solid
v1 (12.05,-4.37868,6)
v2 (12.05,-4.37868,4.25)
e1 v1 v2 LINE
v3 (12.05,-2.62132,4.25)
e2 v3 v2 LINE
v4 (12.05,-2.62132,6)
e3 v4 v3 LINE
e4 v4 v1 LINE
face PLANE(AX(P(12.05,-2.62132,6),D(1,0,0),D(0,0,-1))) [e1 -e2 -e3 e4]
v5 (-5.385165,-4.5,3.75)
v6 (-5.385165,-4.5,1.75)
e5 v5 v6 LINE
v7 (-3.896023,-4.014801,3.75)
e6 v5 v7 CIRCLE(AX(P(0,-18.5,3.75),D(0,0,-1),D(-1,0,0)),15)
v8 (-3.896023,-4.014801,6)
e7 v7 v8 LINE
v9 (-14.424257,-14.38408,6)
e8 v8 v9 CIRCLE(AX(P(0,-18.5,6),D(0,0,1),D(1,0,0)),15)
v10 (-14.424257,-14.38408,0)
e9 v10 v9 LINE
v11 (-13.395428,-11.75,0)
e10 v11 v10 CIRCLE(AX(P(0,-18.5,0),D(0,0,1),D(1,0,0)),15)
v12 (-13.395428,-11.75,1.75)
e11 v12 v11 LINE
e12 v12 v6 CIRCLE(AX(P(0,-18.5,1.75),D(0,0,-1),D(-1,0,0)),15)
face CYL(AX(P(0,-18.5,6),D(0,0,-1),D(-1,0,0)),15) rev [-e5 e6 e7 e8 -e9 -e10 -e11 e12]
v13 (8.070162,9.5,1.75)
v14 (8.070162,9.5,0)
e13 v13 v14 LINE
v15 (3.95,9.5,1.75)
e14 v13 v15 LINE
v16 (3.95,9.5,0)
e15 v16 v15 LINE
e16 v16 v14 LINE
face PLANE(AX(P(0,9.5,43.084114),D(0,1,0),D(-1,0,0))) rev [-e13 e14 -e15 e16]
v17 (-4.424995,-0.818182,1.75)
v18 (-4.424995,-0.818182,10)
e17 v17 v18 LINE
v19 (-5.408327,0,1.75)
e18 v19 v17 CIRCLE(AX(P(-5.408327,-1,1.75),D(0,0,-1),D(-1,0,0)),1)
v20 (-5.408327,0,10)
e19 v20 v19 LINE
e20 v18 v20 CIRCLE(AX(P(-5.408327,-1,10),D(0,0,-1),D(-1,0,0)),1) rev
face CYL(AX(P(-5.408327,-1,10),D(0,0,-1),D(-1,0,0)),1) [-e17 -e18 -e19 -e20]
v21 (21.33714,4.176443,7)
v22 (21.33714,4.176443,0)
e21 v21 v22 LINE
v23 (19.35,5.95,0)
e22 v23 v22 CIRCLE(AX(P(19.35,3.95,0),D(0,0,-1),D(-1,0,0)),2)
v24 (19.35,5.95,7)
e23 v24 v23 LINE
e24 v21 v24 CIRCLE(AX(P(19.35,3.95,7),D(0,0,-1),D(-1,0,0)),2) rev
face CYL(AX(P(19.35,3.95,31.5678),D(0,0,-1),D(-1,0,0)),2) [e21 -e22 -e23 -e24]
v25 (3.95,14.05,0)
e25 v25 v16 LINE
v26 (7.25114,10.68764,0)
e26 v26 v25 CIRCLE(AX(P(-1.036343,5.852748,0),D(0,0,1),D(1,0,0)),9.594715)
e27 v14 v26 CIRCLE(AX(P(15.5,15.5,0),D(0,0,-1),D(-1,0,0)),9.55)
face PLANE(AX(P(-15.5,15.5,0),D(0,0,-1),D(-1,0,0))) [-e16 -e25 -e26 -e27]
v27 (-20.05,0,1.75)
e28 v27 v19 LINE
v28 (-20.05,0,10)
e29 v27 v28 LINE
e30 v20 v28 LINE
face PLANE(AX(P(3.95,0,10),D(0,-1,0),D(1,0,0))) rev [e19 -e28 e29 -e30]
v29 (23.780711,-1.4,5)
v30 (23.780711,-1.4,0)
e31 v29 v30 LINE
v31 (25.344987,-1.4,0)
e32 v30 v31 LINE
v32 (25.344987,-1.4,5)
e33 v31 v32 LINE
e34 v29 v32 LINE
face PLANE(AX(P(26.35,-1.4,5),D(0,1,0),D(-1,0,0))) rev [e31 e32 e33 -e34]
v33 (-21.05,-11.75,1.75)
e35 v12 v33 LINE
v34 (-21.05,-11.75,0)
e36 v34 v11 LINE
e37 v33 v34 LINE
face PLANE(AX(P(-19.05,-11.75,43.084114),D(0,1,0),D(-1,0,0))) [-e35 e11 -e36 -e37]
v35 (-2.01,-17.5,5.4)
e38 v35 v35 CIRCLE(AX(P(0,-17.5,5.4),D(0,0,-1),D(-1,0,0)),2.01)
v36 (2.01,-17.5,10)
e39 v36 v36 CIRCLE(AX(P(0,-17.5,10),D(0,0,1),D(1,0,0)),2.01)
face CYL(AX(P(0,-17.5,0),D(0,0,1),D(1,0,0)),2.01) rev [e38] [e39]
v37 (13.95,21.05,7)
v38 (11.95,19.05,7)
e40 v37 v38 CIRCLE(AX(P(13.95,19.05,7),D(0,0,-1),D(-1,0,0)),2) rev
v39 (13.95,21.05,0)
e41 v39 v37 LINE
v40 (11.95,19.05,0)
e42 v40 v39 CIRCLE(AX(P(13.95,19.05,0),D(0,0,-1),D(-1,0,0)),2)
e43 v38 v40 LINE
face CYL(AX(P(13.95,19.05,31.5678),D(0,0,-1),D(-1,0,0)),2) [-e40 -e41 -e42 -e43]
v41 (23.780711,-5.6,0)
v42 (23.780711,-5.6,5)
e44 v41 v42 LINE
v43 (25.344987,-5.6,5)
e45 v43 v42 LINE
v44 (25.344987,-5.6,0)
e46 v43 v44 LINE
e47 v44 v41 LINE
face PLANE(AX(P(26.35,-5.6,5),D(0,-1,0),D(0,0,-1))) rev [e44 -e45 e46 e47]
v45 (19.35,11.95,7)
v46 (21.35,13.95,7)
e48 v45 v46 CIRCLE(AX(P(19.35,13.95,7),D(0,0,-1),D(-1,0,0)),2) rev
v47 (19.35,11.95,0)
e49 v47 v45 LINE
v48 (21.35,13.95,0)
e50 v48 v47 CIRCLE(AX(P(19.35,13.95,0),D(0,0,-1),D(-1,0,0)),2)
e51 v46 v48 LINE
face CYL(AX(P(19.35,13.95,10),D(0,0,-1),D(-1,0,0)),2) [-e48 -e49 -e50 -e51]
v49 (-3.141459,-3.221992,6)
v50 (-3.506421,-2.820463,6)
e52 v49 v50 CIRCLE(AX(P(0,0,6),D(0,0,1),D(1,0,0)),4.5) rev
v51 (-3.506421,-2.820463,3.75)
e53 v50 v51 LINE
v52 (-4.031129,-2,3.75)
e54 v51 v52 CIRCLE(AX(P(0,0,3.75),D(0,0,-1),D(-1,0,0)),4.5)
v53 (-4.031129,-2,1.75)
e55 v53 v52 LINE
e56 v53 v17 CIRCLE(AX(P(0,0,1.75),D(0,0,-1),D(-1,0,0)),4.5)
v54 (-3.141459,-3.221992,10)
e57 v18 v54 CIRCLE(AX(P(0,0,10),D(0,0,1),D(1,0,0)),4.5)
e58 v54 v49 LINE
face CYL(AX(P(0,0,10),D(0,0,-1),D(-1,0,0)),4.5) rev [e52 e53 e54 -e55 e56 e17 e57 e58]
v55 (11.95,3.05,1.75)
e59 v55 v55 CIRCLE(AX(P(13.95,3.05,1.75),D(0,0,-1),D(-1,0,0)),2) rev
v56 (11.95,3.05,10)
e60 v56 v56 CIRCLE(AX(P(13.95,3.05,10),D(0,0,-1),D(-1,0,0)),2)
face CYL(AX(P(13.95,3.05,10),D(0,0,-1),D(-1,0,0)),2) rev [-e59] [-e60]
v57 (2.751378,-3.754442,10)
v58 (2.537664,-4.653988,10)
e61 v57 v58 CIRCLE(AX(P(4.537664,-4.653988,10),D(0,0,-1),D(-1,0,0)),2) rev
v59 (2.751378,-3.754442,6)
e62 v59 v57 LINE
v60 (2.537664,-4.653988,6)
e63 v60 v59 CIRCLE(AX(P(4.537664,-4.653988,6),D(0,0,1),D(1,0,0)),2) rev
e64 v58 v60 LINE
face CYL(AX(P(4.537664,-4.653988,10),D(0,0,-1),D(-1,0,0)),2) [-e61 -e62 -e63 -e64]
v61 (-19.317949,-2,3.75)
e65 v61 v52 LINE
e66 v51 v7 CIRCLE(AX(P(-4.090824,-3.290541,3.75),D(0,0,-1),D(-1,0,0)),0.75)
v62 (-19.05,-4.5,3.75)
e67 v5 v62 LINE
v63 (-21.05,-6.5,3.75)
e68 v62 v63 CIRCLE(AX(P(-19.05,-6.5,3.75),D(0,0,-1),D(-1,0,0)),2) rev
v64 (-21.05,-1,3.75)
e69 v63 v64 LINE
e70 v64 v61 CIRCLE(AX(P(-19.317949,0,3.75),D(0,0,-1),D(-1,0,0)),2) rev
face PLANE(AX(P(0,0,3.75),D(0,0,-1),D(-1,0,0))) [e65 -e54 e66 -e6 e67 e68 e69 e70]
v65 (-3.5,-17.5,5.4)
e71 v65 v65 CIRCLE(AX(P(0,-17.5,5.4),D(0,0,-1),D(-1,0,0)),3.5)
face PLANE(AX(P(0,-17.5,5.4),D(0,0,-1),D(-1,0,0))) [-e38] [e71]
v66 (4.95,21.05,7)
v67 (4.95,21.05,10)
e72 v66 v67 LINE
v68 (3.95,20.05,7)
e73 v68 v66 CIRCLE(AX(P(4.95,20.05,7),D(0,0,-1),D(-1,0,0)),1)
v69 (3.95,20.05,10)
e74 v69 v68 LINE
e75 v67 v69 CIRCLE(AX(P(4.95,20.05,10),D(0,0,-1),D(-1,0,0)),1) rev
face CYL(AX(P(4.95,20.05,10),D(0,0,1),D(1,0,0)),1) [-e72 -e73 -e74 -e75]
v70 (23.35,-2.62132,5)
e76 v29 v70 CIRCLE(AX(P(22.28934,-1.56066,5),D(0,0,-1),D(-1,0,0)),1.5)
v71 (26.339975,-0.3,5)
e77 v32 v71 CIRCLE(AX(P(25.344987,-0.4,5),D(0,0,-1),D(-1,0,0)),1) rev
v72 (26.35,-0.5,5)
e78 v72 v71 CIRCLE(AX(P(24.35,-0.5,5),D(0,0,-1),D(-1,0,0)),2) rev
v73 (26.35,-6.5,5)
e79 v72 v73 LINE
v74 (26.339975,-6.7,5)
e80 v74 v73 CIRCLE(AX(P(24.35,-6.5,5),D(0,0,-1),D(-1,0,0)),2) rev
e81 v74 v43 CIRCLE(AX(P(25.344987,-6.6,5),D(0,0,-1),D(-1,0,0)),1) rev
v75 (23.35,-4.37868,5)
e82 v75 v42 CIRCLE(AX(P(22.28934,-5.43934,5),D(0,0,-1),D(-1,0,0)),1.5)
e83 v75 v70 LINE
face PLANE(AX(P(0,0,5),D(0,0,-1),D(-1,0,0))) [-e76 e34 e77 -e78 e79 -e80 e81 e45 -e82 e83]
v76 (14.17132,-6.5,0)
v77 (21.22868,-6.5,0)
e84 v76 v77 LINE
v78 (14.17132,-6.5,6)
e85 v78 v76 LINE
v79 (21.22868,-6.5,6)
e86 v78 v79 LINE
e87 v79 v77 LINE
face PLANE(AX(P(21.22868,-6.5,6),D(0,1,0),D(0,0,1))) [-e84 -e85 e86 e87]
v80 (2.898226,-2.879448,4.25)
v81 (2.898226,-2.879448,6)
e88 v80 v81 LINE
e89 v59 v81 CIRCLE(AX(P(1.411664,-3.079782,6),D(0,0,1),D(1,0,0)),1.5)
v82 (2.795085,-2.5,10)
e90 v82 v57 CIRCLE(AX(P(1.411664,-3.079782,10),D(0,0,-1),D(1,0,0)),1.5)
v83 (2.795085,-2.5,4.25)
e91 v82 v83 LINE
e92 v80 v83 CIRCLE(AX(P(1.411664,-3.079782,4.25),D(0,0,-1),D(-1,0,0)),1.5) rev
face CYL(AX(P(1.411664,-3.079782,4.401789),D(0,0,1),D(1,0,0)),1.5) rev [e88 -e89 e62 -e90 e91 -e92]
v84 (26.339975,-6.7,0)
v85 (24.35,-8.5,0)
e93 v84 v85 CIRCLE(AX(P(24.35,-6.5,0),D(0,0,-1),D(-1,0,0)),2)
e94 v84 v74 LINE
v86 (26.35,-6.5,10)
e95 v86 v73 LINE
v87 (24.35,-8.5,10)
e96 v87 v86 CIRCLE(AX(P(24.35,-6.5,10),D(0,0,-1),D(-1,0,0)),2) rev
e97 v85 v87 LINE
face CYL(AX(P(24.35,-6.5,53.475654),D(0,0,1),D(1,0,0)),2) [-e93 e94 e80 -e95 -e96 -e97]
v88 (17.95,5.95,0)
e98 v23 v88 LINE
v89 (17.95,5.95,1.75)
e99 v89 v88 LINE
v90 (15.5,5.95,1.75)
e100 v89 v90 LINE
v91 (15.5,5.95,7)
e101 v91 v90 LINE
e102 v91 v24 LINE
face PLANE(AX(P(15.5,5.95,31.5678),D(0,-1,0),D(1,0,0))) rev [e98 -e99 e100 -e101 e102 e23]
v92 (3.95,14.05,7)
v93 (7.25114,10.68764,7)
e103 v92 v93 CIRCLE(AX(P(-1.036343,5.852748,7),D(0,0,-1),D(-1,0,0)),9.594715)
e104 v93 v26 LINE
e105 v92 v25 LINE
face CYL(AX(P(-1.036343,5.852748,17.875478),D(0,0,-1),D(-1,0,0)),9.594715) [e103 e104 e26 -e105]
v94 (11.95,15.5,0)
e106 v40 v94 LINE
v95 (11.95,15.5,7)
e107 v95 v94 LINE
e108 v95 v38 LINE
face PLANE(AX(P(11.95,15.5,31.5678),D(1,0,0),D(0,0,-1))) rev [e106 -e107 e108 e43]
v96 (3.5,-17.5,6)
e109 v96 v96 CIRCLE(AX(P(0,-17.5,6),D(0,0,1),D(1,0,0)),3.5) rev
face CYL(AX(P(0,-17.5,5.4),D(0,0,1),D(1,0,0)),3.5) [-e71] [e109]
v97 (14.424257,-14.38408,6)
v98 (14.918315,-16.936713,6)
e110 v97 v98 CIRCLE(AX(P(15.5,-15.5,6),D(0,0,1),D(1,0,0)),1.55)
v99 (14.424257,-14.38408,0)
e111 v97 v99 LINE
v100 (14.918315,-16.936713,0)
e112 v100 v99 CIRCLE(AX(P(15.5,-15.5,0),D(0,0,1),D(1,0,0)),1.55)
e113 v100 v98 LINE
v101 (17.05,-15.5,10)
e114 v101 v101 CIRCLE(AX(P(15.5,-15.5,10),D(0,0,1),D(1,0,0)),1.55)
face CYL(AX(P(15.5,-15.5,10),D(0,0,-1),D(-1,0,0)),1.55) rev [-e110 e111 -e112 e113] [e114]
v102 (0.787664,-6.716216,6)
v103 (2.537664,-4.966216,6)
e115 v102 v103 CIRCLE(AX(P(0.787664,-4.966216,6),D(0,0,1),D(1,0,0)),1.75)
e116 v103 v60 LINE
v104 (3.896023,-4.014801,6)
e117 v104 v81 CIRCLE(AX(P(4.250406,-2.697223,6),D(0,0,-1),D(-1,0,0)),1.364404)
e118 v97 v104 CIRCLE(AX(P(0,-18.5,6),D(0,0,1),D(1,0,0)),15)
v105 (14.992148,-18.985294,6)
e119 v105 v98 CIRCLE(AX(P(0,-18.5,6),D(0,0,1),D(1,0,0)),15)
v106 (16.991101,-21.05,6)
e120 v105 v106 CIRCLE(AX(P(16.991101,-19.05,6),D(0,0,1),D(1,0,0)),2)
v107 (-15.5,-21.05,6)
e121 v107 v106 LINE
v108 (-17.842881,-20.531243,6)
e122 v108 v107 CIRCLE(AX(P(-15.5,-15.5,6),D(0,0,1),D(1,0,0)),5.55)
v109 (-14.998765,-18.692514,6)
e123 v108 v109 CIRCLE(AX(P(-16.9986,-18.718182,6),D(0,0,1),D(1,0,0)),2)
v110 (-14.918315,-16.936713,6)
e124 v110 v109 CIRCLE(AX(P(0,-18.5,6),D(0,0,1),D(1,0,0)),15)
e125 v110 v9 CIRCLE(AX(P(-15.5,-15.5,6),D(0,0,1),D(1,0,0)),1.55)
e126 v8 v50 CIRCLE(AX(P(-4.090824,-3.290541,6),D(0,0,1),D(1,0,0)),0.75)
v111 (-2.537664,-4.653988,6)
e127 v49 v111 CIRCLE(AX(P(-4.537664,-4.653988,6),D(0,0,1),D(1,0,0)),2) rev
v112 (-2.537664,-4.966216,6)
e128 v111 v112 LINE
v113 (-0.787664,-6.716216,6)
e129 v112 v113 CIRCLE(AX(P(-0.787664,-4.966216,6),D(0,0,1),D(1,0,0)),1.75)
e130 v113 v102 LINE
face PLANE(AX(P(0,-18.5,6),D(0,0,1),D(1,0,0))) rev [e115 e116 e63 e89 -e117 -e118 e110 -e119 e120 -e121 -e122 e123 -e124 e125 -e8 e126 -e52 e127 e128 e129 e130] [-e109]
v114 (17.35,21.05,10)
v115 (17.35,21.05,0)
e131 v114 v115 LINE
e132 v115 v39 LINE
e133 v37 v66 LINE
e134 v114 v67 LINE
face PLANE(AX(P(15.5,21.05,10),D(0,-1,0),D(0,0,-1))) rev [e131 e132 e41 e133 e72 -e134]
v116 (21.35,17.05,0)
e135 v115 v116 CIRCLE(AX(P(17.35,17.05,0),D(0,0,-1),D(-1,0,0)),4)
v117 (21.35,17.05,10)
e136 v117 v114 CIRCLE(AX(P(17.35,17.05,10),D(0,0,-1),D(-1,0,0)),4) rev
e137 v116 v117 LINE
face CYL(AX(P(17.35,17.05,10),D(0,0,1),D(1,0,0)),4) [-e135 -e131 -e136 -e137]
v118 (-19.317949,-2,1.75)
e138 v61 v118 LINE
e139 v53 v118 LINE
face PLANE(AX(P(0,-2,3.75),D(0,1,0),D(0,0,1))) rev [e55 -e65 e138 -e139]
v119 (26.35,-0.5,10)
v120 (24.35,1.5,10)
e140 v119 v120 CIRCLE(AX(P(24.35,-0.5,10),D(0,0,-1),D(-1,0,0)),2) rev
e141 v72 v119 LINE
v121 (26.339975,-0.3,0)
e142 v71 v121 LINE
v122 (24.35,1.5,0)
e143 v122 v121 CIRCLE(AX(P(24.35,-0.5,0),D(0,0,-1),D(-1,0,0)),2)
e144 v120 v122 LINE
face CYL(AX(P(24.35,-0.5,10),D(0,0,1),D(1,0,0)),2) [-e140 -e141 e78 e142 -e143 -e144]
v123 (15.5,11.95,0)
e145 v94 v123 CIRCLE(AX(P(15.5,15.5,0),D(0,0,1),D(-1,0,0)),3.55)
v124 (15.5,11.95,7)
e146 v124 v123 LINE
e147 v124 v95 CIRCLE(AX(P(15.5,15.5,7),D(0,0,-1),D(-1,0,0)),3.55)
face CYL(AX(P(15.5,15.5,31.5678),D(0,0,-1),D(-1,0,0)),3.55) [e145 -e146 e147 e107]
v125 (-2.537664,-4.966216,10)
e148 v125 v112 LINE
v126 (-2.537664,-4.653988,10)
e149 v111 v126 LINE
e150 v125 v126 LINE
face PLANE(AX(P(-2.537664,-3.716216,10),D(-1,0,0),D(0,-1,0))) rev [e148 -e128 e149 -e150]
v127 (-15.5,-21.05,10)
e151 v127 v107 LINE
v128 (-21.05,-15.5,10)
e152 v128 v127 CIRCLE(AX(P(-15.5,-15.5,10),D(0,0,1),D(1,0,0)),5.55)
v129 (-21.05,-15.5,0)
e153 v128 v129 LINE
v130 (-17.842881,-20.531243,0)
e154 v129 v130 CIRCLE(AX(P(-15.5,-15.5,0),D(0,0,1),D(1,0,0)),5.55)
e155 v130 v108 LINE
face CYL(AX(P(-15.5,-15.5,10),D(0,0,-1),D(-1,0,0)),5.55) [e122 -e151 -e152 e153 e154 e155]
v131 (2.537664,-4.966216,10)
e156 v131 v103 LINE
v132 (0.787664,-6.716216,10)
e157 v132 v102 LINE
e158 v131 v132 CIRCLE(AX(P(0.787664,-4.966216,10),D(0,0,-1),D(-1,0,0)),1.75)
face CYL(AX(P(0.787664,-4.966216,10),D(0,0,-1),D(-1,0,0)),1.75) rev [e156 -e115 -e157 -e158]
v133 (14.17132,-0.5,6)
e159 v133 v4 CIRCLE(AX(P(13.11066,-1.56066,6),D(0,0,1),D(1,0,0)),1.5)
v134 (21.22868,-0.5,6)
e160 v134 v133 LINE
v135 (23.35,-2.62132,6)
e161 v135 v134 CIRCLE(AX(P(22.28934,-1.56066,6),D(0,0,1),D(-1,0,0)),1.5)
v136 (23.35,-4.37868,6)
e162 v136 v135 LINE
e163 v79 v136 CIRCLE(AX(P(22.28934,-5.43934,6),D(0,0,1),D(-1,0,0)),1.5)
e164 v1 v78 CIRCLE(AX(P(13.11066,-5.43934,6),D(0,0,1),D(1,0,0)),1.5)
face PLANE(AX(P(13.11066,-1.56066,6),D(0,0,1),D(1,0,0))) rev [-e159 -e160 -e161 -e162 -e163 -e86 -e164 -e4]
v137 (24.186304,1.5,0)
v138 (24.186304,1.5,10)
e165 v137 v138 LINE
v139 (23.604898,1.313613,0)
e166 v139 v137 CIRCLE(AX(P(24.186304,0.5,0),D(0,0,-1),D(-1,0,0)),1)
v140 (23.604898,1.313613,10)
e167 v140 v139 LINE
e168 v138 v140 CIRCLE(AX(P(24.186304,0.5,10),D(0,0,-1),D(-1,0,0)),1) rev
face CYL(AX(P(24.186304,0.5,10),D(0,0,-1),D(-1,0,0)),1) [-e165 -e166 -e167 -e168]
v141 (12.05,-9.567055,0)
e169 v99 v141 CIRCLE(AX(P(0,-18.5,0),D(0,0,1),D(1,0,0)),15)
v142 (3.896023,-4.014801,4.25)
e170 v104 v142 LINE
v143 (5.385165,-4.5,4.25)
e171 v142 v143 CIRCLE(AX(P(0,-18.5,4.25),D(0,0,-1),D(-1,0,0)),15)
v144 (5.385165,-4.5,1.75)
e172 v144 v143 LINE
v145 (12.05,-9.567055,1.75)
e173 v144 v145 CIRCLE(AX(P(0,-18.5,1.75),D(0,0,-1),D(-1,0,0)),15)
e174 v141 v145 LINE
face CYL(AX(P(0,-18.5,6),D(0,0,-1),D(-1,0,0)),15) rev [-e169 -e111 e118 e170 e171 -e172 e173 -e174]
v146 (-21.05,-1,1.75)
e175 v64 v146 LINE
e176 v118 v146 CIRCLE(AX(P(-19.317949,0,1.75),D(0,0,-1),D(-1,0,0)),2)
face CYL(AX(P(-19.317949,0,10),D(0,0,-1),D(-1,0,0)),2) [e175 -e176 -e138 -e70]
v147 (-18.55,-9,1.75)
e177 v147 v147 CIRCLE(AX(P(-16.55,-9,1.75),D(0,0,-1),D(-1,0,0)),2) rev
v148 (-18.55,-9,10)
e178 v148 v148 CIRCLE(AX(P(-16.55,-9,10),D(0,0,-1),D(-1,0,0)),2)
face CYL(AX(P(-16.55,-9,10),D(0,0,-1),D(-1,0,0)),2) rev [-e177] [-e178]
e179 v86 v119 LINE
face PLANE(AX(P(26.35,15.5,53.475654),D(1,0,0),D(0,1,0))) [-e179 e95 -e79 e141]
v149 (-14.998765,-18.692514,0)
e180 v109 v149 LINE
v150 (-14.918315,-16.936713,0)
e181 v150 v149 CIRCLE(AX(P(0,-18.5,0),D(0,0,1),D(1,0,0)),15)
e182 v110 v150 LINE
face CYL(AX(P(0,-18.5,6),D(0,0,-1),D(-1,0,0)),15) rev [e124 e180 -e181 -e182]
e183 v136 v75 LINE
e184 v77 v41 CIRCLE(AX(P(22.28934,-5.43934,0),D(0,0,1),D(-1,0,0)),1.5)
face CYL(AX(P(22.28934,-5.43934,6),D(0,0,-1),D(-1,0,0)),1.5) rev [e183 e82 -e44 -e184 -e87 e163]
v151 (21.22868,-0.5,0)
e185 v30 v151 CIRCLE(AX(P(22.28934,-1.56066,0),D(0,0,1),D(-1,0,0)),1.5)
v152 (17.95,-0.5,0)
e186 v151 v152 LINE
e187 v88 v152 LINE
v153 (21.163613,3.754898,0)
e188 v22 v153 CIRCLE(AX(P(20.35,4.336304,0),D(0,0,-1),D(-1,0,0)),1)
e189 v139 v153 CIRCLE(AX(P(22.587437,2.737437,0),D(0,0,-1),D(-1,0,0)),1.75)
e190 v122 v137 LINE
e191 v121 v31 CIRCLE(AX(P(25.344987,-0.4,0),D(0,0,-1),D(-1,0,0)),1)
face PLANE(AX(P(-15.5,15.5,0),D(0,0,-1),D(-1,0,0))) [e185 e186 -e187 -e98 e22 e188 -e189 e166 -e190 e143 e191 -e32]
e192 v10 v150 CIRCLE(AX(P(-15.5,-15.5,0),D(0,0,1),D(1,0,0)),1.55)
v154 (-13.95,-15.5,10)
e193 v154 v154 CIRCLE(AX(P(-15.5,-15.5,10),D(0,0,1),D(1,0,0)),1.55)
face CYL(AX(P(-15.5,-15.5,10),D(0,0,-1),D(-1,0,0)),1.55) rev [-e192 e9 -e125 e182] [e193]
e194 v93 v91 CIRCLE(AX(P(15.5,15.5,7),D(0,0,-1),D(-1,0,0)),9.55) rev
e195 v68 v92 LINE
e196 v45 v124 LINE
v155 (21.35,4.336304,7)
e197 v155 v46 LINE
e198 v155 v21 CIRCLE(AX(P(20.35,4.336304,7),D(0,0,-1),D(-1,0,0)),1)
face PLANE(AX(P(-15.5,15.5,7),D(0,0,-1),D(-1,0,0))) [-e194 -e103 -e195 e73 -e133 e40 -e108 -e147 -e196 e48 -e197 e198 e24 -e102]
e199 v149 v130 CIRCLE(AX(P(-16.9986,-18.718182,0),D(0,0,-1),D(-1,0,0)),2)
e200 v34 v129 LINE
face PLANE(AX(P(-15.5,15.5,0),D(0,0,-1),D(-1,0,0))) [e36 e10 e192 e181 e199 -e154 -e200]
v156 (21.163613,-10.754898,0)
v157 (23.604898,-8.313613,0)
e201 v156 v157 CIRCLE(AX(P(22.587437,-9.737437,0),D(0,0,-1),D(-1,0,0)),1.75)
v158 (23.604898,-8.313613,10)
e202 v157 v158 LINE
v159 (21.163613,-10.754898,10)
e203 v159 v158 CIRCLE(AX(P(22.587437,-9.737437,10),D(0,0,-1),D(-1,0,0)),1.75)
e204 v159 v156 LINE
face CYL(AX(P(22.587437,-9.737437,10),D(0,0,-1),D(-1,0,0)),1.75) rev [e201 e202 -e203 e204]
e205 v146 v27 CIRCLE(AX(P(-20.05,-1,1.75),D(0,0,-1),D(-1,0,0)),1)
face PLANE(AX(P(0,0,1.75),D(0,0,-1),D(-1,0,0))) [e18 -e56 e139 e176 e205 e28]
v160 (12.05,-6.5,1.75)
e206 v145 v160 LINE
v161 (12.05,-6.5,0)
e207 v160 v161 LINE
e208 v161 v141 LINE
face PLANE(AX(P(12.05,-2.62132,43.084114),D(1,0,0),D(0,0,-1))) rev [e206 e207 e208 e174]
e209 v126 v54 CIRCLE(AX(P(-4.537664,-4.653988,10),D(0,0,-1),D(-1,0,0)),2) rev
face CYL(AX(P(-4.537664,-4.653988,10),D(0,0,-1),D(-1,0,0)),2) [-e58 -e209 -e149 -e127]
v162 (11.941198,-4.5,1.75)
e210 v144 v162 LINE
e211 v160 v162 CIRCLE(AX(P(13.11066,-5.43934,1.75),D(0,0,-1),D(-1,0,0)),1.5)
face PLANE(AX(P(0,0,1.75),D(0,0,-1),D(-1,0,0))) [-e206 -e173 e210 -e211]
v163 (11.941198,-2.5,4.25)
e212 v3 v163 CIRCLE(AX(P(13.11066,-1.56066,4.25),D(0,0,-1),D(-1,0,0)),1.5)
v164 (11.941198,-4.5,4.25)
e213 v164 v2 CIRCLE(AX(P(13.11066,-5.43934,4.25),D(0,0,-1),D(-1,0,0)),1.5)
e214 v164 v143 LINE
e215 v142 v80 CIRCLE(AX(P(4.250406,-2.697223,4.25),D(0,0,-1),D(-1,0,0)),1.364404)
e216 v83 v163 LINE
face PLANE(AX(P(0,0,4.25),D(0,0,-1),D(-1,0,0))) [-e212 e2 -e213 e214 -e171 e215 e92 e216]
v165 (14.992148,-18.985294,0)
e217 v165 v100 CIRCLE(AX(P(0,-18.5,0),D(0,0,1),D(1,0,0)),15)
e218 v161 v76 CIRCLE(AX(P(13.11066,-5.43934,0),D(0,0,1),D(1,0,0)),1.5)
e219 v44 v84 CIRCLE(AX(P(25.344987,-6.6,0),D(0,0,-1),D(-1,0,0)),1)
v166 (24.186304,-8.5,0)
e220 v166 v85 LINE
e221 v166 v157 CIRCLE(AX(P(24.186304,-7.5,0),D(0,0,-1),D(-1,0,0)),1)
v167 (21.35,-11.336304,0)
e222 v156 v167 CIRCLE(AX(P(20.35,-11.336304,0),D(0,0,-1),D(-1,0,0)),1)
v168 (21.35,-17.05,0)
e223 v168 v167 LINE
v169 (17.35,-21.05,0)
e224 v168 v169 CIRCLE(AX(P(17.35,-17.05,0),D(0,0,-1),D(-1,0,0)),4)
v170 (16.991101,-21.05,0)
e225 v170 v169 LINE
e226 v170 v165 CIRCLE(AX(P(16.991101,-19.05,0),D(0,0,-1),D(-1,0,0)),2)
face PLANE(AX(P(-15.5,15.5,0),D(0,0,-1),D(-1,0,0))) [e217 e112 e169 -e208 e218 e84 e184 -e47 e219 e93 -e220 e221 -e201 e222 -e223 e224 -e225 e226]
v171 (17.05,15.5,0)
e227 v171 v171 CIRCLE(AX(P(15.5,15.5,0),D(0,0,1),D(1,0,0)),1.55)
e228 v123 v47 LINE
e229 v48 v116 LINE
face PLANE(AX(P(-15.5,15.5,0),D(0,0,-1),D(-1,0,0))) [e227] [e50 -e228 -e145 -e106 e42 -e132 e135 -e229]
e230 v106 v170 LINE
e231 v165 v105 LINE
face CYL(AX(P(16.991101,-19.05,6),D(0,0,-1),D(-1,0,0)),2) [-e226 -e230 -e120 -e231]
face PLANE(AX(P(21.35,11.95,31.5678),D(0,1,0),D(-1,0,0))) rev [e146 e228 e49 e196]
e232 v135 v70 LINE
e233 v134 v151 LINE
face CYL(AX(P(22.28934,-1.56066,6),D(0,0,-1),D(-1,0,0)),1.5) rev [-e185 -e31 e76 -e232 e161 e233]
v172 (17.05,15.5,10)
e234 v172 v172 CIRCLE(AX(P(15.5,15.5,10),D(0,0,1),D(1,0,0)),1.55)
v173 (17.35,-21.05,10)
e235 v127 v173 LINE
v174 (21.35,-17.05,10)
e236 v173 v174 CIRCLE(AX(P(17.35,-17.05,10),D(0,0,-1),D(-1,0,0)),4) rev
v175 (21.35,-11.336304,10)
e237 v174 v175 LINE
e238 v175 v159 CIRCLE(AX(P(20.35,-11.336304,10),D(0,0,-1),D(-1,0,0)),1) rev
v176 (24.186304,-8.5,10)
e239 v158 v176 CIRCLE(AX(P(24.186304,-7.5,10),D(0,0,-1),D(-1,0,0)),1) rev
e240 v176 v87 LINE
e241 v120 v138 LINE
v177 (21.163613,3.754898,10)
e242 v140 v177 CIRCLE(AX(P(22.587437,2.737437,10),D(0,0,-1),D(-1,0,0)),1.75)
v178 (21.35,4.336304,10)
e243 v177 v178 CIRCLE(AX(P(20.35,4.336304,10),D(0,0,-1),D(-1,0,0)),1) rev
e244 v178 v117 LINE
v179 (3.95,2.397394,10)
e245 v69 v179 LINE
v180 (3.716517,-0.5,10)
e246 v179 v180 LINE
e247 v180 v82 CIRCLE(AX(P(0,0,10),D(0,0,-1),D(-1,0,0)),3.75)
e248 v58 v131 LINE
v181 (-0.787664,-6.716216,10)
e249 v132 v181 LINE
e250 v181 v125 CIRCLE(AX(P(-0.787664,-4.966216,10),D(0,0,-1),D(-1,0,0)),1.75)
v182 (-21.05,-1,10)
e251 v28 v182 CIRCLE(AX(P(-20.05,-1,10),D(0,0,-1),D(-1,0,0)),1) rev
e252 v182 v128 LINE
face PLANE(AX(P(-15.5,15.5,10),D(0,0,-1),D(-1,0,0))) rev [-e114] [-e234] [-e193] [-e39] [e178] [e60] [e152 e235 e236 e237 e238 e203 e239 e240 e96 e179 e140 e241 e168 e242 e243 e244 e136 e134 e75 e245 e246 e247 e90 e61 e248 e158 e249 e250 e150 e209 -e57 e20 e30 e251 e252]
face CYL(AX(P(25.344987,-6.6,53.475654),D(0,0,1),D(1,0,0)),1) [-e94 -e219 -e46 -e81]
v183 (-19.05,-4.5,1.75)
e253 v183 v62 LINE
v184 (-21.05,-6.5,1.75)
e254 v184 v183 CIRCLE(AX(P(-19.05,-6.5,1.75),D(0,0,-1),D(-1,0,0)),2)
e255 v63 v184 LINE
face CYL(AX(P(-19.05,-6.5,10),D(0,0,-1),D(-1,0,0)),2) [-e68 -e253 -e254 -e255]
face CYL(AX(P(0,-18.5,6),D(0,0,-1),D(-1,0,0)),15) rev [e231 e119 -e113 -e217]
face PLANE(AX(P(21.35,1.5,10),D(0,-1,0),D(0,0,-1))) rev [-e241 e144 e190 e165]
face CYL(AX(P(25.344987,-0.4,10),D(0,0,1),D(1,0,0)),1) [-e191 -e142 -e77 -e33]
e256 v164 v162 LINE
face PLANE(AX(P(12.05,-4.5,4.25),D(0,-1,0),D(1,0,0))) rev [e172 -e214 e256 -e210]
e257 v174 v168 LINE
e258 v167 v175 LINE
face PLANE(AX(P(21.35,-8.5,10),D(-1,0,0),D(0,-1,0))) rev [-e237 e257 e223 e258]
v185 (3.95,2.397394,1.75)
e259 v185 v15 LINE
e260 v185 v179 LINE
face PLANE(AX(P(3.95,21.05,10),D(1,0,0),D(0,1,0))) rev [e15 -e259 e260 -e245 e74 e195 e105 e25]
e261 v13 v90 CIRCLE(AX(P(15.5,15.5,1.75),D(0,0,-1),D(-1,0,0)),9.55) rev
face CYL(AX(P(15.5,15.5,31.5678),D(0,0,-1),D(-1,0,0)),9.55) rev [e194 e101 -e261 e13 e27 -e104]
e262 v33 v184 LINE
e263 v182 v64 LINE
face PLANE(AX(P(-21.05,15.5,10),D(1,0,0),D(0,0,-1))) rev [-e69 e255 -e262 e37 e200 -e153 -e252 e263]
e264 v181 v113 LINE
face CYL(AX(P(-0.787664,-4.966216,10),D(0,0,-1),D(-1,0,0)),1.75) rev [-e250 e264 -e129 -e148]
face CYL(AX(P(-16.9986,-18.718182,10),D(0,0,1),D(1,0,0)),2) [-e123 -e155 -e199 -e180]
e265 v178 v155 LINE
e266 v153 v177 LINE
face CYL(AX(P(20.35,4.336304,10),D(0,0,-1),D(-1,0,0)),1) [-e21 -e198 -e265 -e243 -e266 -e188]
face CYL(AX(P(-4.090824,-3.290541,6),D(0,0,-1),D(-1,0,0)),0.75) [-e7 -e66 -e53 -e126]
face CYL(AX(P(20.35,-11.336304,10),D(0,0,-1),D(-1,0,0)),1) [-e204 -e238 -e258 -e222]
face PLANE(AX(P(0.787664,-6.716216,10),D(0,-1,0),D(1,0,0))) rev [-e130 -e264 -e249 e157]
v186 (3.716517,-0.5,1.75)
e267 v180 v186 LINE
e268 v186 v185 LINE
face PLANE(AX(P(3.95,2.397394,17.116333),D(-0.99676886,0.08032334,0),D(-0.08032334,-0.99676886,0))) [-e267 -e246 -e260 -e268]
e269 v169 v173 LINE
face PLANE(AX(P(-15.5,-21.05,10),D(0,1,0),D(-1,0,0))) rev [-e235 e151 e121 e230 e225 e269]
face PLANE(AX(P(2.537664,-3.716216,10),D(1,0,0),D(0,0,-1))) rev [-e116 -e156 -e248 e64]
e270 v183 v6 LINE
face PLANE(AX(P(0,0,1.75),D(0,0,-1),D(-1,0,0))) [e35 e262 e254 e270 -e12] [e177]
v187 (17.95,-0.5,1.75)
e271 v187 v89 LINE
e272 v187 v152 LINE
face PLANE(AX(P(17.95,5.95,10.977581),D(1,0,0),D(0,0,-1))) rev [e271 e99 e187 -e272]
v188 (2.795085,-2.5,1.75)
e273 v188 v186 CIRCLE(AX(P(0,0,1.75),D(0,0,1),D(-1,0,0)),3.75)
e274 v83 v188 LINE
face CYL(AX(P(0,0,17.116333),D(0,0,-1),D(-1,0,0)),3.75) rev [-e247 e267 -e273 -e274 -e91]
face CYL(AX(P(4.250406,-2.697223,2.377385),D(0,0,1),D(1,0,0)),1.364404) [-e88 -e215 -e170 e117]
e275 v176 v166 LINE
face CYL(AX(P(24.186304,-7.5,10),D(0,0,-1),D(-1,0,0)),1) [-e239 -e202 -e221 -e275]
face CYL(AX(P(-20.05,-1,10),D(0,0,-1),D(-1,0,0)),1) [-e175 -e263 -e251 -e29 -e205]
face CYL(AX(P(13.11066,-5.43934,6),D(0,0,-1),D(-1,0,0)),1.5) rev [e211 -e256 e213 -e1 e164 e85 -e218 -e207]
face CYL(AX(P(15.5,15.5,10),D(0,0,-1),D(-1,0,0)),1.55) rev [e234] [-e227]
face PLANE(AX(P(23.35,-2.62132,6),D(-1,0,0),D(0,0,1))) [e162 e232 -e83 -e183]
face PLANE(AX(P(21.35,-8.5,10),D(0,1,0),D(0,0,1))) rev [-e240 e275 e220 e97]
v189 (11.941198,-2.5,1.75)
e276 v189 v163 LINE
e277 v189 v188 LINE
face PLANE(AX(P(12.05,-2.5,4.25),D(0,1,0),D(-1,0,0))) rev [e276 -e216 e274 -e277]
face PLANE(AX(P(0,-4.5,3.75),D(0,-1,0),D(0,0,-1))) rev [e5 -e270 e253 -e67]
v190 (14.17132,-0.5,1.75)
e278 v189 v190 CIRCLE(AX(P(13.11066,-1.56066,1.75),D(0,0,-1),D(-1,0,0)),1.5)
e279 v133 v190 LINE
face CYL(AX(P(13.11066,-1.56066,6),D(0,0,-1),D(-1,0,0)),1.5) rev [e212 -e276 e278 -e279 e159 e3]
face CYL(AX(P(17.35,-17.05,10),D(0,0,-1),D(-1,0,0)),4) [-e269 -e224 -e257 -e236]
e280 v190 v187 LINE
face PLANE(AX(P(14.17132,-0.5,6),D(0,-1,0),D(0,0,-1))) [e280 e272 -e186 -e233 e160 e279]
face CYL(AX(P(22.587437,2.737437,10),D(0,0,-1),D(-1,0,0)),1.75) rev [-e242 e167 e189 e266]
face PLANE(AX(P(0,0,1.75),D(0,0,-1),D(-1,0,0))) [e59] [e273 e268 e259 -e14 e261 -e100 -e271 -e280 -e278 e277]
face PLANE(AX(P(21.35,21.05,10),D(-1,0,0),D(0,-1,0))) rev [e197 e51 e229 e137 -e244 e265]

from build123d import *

# Parameters (mm, degrees)
SKETCH1_R                = 4.5
SKETCH1_R_2              = 1.55
BOSS_EXTRUDE1_DEPTH      = 10
BOSS_EXTRUDE5_DEPTH      = 10
SKETCH2_R                = 2.01
CUT_EXTRUDE1_DEPTH       = 36.177052179
SKETCH3_R                = 15
CUT_EXTRUDE3_DEPTH       = 6
CUT_EXTRUDE4_DEPTH       = 6
SKETCH6_W                = 12.05
SKETCH6_H                = 2
CUT_EXTRUDE6_DEPTH       = 4.25
SKETCH24_W               = 3
SKETCH24_H               = 4.2
CUT_EXTRUDE17_DEPTH      = 5
SKETCH13_W               = 21.05
SKETCH13_H               = 2.5
CUT_EXTRUDE10_DEPTH      = 3.75
CUT_EXTRUDE12_DEPTH      = 35.255291562
CUT_EXTRUDE12_DEPTH_BACK = 35.255291562
CUT_EXTRUDE21_DEPTH      = 4.25
SKETCH29_W               = 5
SKETCH29_H               = 19.55
SKETCH29_H_2             = 12.55
CUT_EXTRUDE22_DEPTH      = 36.177052179
SKETCH32_R               = 3.5
SKETCH32_R_2             = 2.01
BOSS_EXTRUDE6_DEPTH      = 0.6
CUT_EXTRUDE24_DEPTH      = 7
FILLET12_R               = 2
FILLET6_R                = 0.75
SKETCH34_W               = 25
SKETCH34_H               = 21.05
CUT_EXTRUDE25_DEPTH      = 36.177052179
SKETCH35_R               = 2
CUT_EXTRUDE27_DEPTH      = 36.177052179
CUT_EXTRUDE29_START      = -1.75
CUT_EXTRUDE29_DEPTH      = 1.75
SKETCH37_W               = 33.1
SKETCH37_H               = 21.25
CUT_EXTRUDE30_DEPTH      = 1.75
SKETCH38_R               = 1.75
CUT_EXTRUDE31_DEPTH      = 36.177052179
CUT_EXTRUDE33_DEPTH      = 7
FILLET13_R               = 4
FILLET7_R                = 2
FILLET3_R                = 2
FILLET15_START           = -1
FILLET15_DEPTH           = 6
FILLET15_START_2         = 4.9438
FILLET15_2_DEPTH         = 6.0562
FILLET14_R               = 1
BOSS_EXTRUDE8_DEPTH      = 8.25
BOSS_EXTRUDE9_START      = -4
BOSS_EXTRUDE9_DEPTH      = 4
BOSS_EXTRUDE10_START     = 1.75
BOSS_EXTRUDE10_DEPTH     = 1.75
CUT_EXTRUDE35_DEPTH      = 1.75
FILLET18_R               = 2


with BuildPart() as part:
    # Sketch1 → Boss-Extrude1 (new body)
    with BuildSketch(Plane.XY):
        with BuildLine():
            Line((-21.05, 15.5), (-21.05, -15.5))
            ThreePointArc((-21.05, -15.5), (-19.424442636, -19.424442636), (-15.5, -21.05))
            Line((-15.5, -21.05), (15.5, -21.05))
            ThreePointArc((15.5, -21.05), (19.424442636, -19.424442636), (21.05, -15.5))
            Line((21.05, -15.5), (21.05, 15.5))
            ThreePointArc((21.05, 15.5), (19.424442636, 19.424442636), (15.5, 21.05))
            Line((15.5, 21.05), (-15.5, 21.05))
            ThreePointArc((-15.5, 21.05), (-19.424442636, 19.424442636), (-21.05, 15.5))
        make_face()
        Circle(SKETCH1_R, mode=Mode.SUBTRACT)
        with Locations((-15.5, -15.5)):
            Circle(SKETCH1_R_2, mode=Mode.SUBTRACT)
        with Locations((15.5, 15.5)):
            Circle(SKETCH1_R_2, mode=Mode.SUBTRACT)
        with Locations((15.5, -15.5)):
            Circle(SKETCH1_R_2, mode=Mode.SUBTRACT)
        with Locations(Location((-15.5, 15.5, 0), (0, 0, 180))):
            Circle(SKETCH1_R_2, mode=Mode.SUBTRACT)
    extrude(amount=BOSS_EXTRUDE1_DEPTH)

    # Sketch23 → Boss-Extrude5 (add)
    with BuildSketch(Plane(origin=(0, 0, 0), x_dir=(-1, 0, 0), z_dir=(0, 0, -1))):
        with BuildLine():
            Line((-21.05, -15.5), (-21.05, 15.5))
            ThreePointArc((-21.05, 15.5), (-19.424442636, 19.424442636), (-15.5, 21.05))
            Line((-15.5, 21.05), (-20.8, 21.05))
            ThreePointArc((-20.8, 21.05), (-24.724442636, 19.424442636), (-26.35, 15.5))
            Line((-26.35, 15.5), (-26.35, -15.5))
            ThreePointArc((-26.35, -15.5), (-24.724442636, -19.424442636), (-20.8, -21.05))
            Line((-20.8, -21.05), (-15.5, -21.05))
            ThreePointArc((-15.5, -21.05), (-19.424442636, -19.424442636), (-21.05, -15.5))
        make_face()
    extrude(amount=-BOSS_EXTRUDE5_DEPTH)

    # Sketch2 → Cut-Extrude1 (cut, through all)
    with BuildSketch(Plane.XY.offset(10)):
        with Locations((0, -17.5)):
            Circle(SKETCH2_R)
    extrude(amount=-CUT_EXTRUDE1_DEPTH, mode=Mode.SUBTRACT)

    # Sketch3 → Cut-Extrude3 (cut)
    with BuildSketch(Plane.XY):
        with Locations((0, -18.5)):
            Circle(SKETCH3_R)
    extrude(amount=CUT_EXTRUDE3_DEPTH, mode=Mode.SUBTRACT)

    # Sketch4 → Cut-Extrude4 (cut)
    with BuildSketch(Plane.XY):
        with BuildLine():
            Line((12.05, -2.621320344), (12.05, -4.378679656))
            ThreePointArc((12.05, -4.378679656), (12.05, -6.5), (14.171320344, -6.5))
            Line((14.171320344, -6.5), (21.228679656, -6.5))
            ThreePointArc((21.228679656, -6.5), (23.35, -6.5), (23.35, -4.378679656))
            Line((23.35, -4.378679656), (23.35, -2.621320344))
            ThreePointArc((23.35, -2.621320344), (23.35, -0.5), (21.228679656, -0.5))
            Line((21.228679656, -0.5), (14.171320344, -0.5))
            ThreePointArc((14.171320344, -0.5), (12.05, -0.5), (12.05, -2.621320344))
        make_face()
    extrude(amount=CUT_EXTRUDE4_DEPTH, mode=Mode.SUBTRACT)

    # Sketch6 → Cut-Extrude6 (cut)
    with BuildSketch(Plane(origin=(0, 0, 0), x_dir=(-1, 0, 0), z_dir=(0, 0, -1))):
        with Locations((-6.025, -3.5)):
            Rectangle(SKETCH6_W, SKETCH6_H)
    extrude(amount=-CUT_EXTRUDE6_DEPTH, mode=Mode.SUBTRACT)

    # Sketch24 → Cut-Extrude17 (cut)
    with BuildSketch(Plane(origin=(0, 0, 0), x_dir=(-1, 0, 0), z_dir=(0, 0, -1))):
        with Locations((-24.85, -3.5)):
            Rectangle(SKETCH24_W, SKETCH24_H)
    extrude(amount=-CUT_EXTRUDE17_DEPTH, mode=Mode.SUBTRACT)

    # Sketch13 → Cut-Extrude10 (cut)
    with BuildSketch(Plane(origin=(0, 0, 0), x_dir=(-1, 0, 0), z_dir=(0, 0, -1))):
        with Locations((10.525, -3.25)):
            Rectangle(SKETCH13_W, SKETCH13_H)
    extrude(amount=-CUT_EXTRUDE10_DEPTH, mode=Mode.SUBTRACT)

    # Sketch15 → Cut-Extrude12 (cut, two sides: drawn at the far end of the back side and taken through both)
    with BuildSketch(Plane(origin=(0, 0, 6), x_dir=(-1, 0, 0), z_dir=(0, 0, -1)).offset(-CUT_EXTRUDE12_DEPTH_BACK)):
        with BuildLine():
            Line((-2.537663696, -3.716216216), (2.537663696, -3.716216216))
            Line((2.537663696, -3.716216216), (2.537663696, -4.966216216))
            ThreePointArc((2.537663696, -4.966216216), (2.025100563, -6.203653083), (0.787663696, -6.716216216))
            Line((0.787663696, -6.716216216), (-0.787663696, -6.716216216))
            ThreePointArc((-0.787663696, -6.716216216), (-2.025100563, -6.203653083), (-2.537663696, -4.966216216))
            Line((-2.537663696, -4.966216216), (-2.537663696, -3.716216216))
        make_face()
    extrude(amount=CUT_EXTRUDE12_DEPTH + CUT_EXTRUDE12_DEPTH_BACK, mode=Mode.SUBTRACT)

    # Sketch28 → Cut-Extrude21 (cut)
    with BuildSketch(Plane(origin=(0, 0, 0), x_dir=(-1, 0, 0), z_dir=(0, 0, -1))):
        with BuildLine():
            Line((-7.958196408, -2.5), (-3.741657387, -2.5))
            ThreePointArc((-3.741657387, -2.5), (-4.133186129, -1.779542756), (-4.387482194, -1))
            ThreePointArc((-4.387482194, -1), (-6.021704735, -2.109772229), (-7.958196408, -2.5))
        make_face()
    extrude(amount=-CUT_EXTRUDE21_DEPTH, mode=Mode.SUBTRACT)

    # Sketch29 → Cut-Extrude22 (cut, through all)
    with BuildSketch(Plane(origin=(0, 0, 0), x_dir=(-1, 0, 0), z_dir=(0, 0, -1))):
        with Locations((-23.85, 11.275)):
            Rectangle(SKETCH29_W, SKETCH29_H)
        with Locations((-23.85, -14.775)):
            Rectangle(SKETCH29_W, SKETCH29_H_2)
    extrude(amount=-CUT_EXTRUDE22_DEPTH, mode=Mode.SUBTRACT)

    # Sketch32 → Boss-Extrude6 (add)
    with BuildSketch(Plane(origin=(0, 0, 6), x_dir=(-1, 0, 0), z_dir=(0, 0, -1))):
        with Locations(Location((0, -17.5, 0), (0, 0, 180))):
            Circle(SKETCH32_R)
        with Locations(Location((0, -17.5, 0), (0, 0, 180))):
            Circle(SKETCH32_R_2, mode=Mode.SUBTRACT)
    extrude(amount=BOSS_EXTRUDE6_DEPTH)

    # Sketch33 → Cut-Extrude24 (cut)
    with BuildSketch(Plane(origin=(0, 0, 0), x_dir=(-1, 0, 0), z_dir=(0, 0, -1))):
        with BuildLine():
            Line((-11.95, 15.5), (-11.95, 21.05))
            Line((-11.95, 21.05), (-5.95, 21.05))
            Line((-5.95, 21.05), (-5.95, 15.5))
            ThreePointArc((-5.95, 15.5), (-8.74713024, 8.74713024), (-15.5, 5.95))
            Line((-15.5, 5.95), (-21.35, 5.95))
            Line((-21.35, 5.95), (-21.35, 11.95))
            Line((-21.35, 11.95), (-15.5, 11.95))
            ThreePointArc((-15.5, 11.95), (-12.989770927, 12.989770927), (-11.95, 15.5))
        make_face()
    extrude(amount=-CUT_EXTRUDE24_DEPTH, mode=Mode.SUBTRACT)

    # Fillet12
    fillet12_edges = [part.edges().sort_by_distance(p)[0] for p in [
        (26.35, 1.5, 5),
        (26.35, -8.5, 5),
        (11.95, 21.05, 3.5),
        (5.95, 21.05, 3.5),
        (21.35, 5.95, 3.5),
        (21.35, 11.95, 3.5),
    ]]
    fillet(fillet12_edges, radius=FILLET12_R)

    # Fillet6
    # the kernel refuses this fillet: 0.75 mm, written as the material it takes off along each edge
    with BuildSketch(Plane(origin=(2.537663696, -3.716216216, 6), x_dir=(0.9766828905522948, -0.2146870543428597, 0), z_dir=(0, 0, -1))) as fillet6_piece_1:
        with BuildLine():
            CenterArc((1.425558271, -0.749193611), FILLET6_R, 92.657162867, 113.757860556)
            ThreePointArc((0.753861914, -1.082846131), (0.416833367, -0.513643581), (0, 0))
            ThreePointArc((0, 0), (0.695394279, -0.016127777), (1.390788557, 0))
        make_face()
    extrude(amount=5.226971393, mode=Mode.SUBTRACT)
    with BuildSketch(Plane(origin=(-2.537663696, -3.716216216, 6), x_dir=(-0.9766828905522948, -0.21468705434286006, 0), z_dir=(0, 0, -1))) as fillet6_piece_2:
        with BuildLine():
            CenterArc((1.425558271, 0.749193611), FILLET6_R, 153.584976577, 113.757860556)
            ThreePointArc((0.753861914, 1.082846131), (0.416833367, 0.513643581), (0, 0))
            ThreePointArc((0, 0), (0.695394279, 0.016127777), (1.390788557, 0))
        make_face()
    extrude(amount=5.726971393, mode=Mode.SUBTRACT)

    # Sketch34 → Cut-Extrude25 (cut, through all)
    with BuildSketch(Plane(origin=(0, 0, 0), x_dir=(-1, 0, 0), z_dir=(0, 0, -1))):
        with Locations((8.55, 10.525)):
            Rectangle(SKETCH34_W, SKETCH34_H)
    extrude(amount=-CUT_EXTRUDE25_DEPTH, mode=Mode.SUBTRACT)

    # Sketch35 → Cut-Extrude27 (cut, through all)
    with BuildSketch(Plane(origin=(0, 0, 0), x_dir=(-1, 0, 0), z_dir=(0, 0, -1))):
        with Locations((16.55, -9)):
            Circle(SKETCH35_R)
        with Locations((-13.95, 3.05)):
            Circle(SKETCH35_R)
    extrude(amount=-CUT_EXTRUDE27_DEPTH, mode=Mode.SUBTRACT)

    # Sketch36 → Cut-Extrude29 (cut)
    with BuildSketch(Plane(origin=(0, 0, 0), x_dir=(-1, 0, 0), z_dir=(0, 0, -1)).offset(CUT_EXTRUDE29_START)):
        with BuildLine():
            Line((-12.05, -2.621320344), (-12.05, 7.5))
            ThreePointArc((-12.05, 7.5), (-11.464213562, 8.914213562), (-10.05, 9.5))
            Line((-10.05, 9.5), (0, 9.5))
            ThreePointArc((0, 9.5), (6.105503576, 7.278243338), (9.355229626, 1.652173913))
            ThreePointArc((9.355229626, 1.652173913), (10.039382479, 0.467738245), (11.324751653, 0))
            Line((11.324751653, 0), (19.05, 0))
            ThreePointArc((19.05, 0), (20.464213562, -0.585786438), (21.05, -2))
            Line((21.05, -2), (21.05, -9.75))
            ThreePointArc((21.05, -9.75), (20.464213562, -11.164213562), (19.05, -11.75))
            Line((19.05, -11.75), (13.997767679, -11.75))
            ThreePointArc((13.997767679, -11.75), (13.490015279, -11.611503047), (13.122907199, -11.234375))
            ThreePointArc((13.122907199, -11.234375), (9.243460442, -6.686514525), (3.896023084, -4.014800515))
            ThreePointArc((3.896023084, -4.014800515), (3.377802295, -3.523133979), (3.506420776, -2.82046332))
            ThreePointArc((3.506420776, -2.82046332), (2.498000201, 3.742992786), (-3.95, 2.155806114))
            ThreePointArc((-3.95, 2.155806114), (-4.482227913, -0.399540902), (-3.506420776, -2.82046332))
            ThreePointArc((-3.506420776, -2.82046332), (-3.377802295, -3.523133979), (-3.896023084, -4.014800515))
            ThreePointArc((-3.896023084, -4.014800515), (-7.356020854, -5.427549686), (-10.359375, -7.651804315))
            ThreePointArc((-10.359375, -7.651804315), (-11.443303318, -7.848000047), (-12.05, -6.92859127))
            Line((-12.05, -6.92859127), (-12.05, -2.621320344))
        make_face()
    extrude(amount=CUT_EXTRUDE29_DEPTH, mode=Mode.SUBTRACT)

    # Sketch37 → Cut-Extrude30 (cut)
    with BuildSketch(Plane(origin=(0, 0, 0), x_dir=(-1, 0, 0), z_dir=(0, 0, -1))):
        with Locations((4.5, -1.125)):
            Rectangle(SKETCH37_W, SKETCH37_H)
    extrude(amount=-CUT_EXTRUDE30_DEPTH, mode=Mode.SUBTRACT)

    # Sketch38 → Cut-Extrude31 (cut, through all)
    with BuildSketch(Plane(origin=(0, 0, 0), x_dir=(-1, 0, 0), z_dir=(0, 0, -1))):
        with Locations((-22.587436867, 2.737436867)):
            Circle(SKETCH38_R)
        with Locations((-22.587436867, -9.737436867)):
            Circle(SKETCH38_R)
    extrude(amount=-CUT_EXTRUDE31_DEPTH, mode=Mode.SUBTRACT)

    # Sketch40 → Cut-Extrude33 (cut)
    with BuildSketch(Plane(origin=(0, 0, 0), x_dir=(-1, 0, 0), z_dir=(0, 0, -1))):
        with BuildLine():
            Line((-3.95, 14.05), (-3.95, 21.05))
            ThreePointArc((-3.95, 21.05), (-5.364213562, 20.464213562), (-5.95, 19.05))
            Line((-5.95, 19.05), (-5.95, 15.5))
            ThreePointArc((-5.95, 15.5), (-6.281021898, 13.007422468), (-7.251139843, 10.687640276))
            ThreePointArc((-7.251139843, 10.687640276), (-5.810187421, 12.574621044), (-3.95, 14.05))
        make_face()
    extrude(amount=-CUT_EXTRUDE33_DEPTH, mode=Mode.SUBTRACT)

    # Fillet13
    # the kernel refuses this fillet: 4 mm, written as the material it takes off along each edge
    with BuildSketch(Plane(origin=(21.35, -21.022680509, 20.000233233), x_dir=(-0.999976677234368, -0.006829713560069607, 0), z_dir=(0, 0, -1))) as fillet13_piece_1:
        with BuildLine():
            CenterArc((3.972774439, 3.999906709), FILLET13_R, 180.391316804, 90)
            Line((-0.02713227, 3.972587855), (-0.427122941, 3.969855969))
            Line((-0.427122941, 3.969855969), (-0.399990671, -0.002731885))
            Line((-0.399990671, -0.002731885), (-0.036920277, -0.398292472))
            ThreePointArc((-0.036920277, -0.398292472), (0.552905642, -0.423553183), (4.002825179, -0.399990671))
            Line((4.002825179, -0.399990671), (4.000093293, 0))
        make_face()
    extrude(amount=30.000466466, mode=Mode.SUBTRACT)
    with BuildSketch(Plane(origin=(21.35, 21.022680509, 20.000233233), x_dir=(0, -1, 0), z_dir=(0, 0, -1))) as fillet13_piece_2:
        with BuildLine():
            CenterArc((3.972680509, 4), FILLET13_R, 180, 90)
            Line((-0.027319491, 4), (-0.427319491, 4))
            ThreePointArc((-0.427319491, 4), (-0.427319491, 0.55), (-0.398031028, -0.03963964))
            Line((-0.398031028, -0.03963964), (0, -0.4))
            Line((0, -0.4), (3.972680509, -0.4))
            Line((3.972680509, -0.4), (3.972680509, 0))
        make_face()
    extrude(amount=30.000466466, mode=Mode.SUBTRACT)

    # Fillet7
    fillet7_edges = [part.edges().sort_by_distance(p)[0] for p in [
        (-2.537663696, -3.716216216, 8),
        (2.537663696, -3.716216216, 8),
    ]]
    fillet(fillet7_edges, radius=FILLET7_R)

    # Fillet3
    # the kernel refuses this fillet: 2 mm, written as the material it takes off along each edge
    with BuildSketch(Plane(origin=(14.781660935, -21.05, 6), x_dir=(1, 0, 0), z_dir=(0, 0, -1))) as fillet3_piece_1:
        with BuildLine():
            CenterArc((2.209439677, -2), FILLET3_R, 90, 91.854010516)
            ThreePointArc((0.210486664, -2.064705882), (0.140995372, -1.028708196), (0, 0))
            Line((0, 0), (2.209439677, 0))
        make_face()
    extrude(amount=11.523599192, mode=Mode.SUBTRACT)
    with BuildSketch(Plane(origin=(-14.781660935, -21.05, 6), x_dir=(-0.9859435440866066, 0.16707880737526726, 0), z_dir=(0, 0, -1))) as fillet3_piece_2:
        with BuildLine():
            CenterArc((2.575373886, 1.928636914), FILLET3_R, 169.646612686, 115.70518839)
            Line((0.607937875, 2.288074726), (0.411194274, 2.324018507))
            ThreePointArc((0.411194274, 2.324018507), (0.15588701, 1.183382499), (-0.188637763, 0.066451444))
            Line((-0.188637763, 0.066451444), (-0.033415761, -0.197188709))
            ThreePointArc((-0.033415761, -0.197188709), (0.674826002, -0.317207943), (3.157812881, -0.192863691))
            Line((3.157812881, -0.192863691), (3.104863882, 0))
        make_face()
    extrude(amount=13.762159704, mode=Mode.SUBTRACT)

    # Fillet15: read off the stored shape, not the designer's step
    # Fillet15 outline → Fillet15 (cut)
    with BuildSketch(Plane.XY.offset(FILLET15_START)):
        with BuildLine():
            ThreePointArc((21.35, -10.974873734), (21.252268718, -10.868730822), (21.163613406, -10.754897801))
            ThreePointArc((21.163613406, -10.754897801), (21.302263988, -11.031028277), (21.35, -11.336304049))
            Line((21.35, -11.336304049), (21.35, -10.974873734))
        make_face()
        with BuildLine():
            Line((23.824873734, -8.5), (24.186304049, -8.5))
            ThreePointArc((24.186304049, -8.5), (23.881028277, -8.452263988), (23.604897801, -8.313613406))
            ThreePointArc((23.604897801, -8.313613406), (23.718730822, -8.402268718), (23.824873734, -8.5))
        make_face()
        with BuildLine():
            Line((26.35, -6.5), (26.35, -5.6))
            Line((26.35, -5.6), (25.344987437, -5.6))
            ThreePointArc((25.344987437, -5.6), (26.086607286, -5.929179607), (26.339974874, -6.7))
            ThreePointArc((26.339974874, -6.7), (26.347492146, -6.60012555), (26.35, -6.5))
        make_face()
        with BuildLine():
            ThreePointArc((26.35, -0.5), (26.347492146, -0.39987445), (26.339974874, -0.3))
            ThreePointArc((26.339974874, -0.3), (26.086607286, -1.070820393), (25.344987437, -1.4))
            Line((25.344987437, -1.4), (26.35, -1.4))
            Line((26.35, -1.4), (26.35, -0.5))
        make_face()
        with BuildLine():
            ThreePointArc((23.824873734, 1.5), (23.718730822, 1.402268718), (23.604897801, 1.313613406))
            ThreePointArc((23.604897801, 1.313613406), (23.881028277, 1.452263988), (24.186304049, 1.5))
            Line((24.186304049, 1.5), (23.824873734, 1.5))
        make_face()
        with BuildLine():
            ThreePointArc((21.349847213, 3.974720928), (21.346043284, 4.075742629), (21.337139537, 4.176443063))
            ThreePointArc((21.337139537, 4.176443063), (21.274717737, 3.955650522), (21.163613406, 3.754897801))
            ThreePointArc((21.163613406, 3.754897801), (21.252198876, 3.868648388), (21.349847213, 3.974720928))
        make_face()
        with BuildLine():
            ThreePointArc((3.95, 2.155806114), (4.001179611, 2.059262422), (4.05, 1.961504525))
            ThreePointArc((4.05, 1.961504525), (3.975320566, 2.173787622), (3.95, 2.397394419))
            Line((3.95, 2.397394419), (3.95, 2.155806114))
        make_face()
        with BuildLine():
            Line((-4.5, 0), (-5.408326913, 0))
            ThreePointArc((-5.408326913, 0), (-4.768724764, -0.231293885), (-4.424994747, -0.818181818))
            ThreePointArc((-4.424994747, -0.818181818), (-4.481209455, -0.410806303), (-4.5, 0))
        make_face()
        with BuildLine():
            ThreePointArc((-21.05, -1), (-20.757106781, -0.292893219), (-20.05, 0))
            Line((-20.05, 0), (-21.05, 0))
            Line((-21.05, 0), (-21.05, -1))
        make_face()
    extrude(amount=FILLET15_DEPTH, mode=Mode.SUBTRACT)

    # Fillet15 2 outline → Fillet15 2 (cut)
    with BuildSketch(Plane.XY.offset(FILLET15_START_2)):
        with BuildLine():
            Line((21.35, 3.974873734), (21.35, 4.336304049))
            ThreePointArc((21.35, 4.336304049), (21.302263988, 4.031028277), (21.163613406, 3.754897801))
            ThreePointArc((21.163613406, 3.754897801), (21.252268718, 3.868730822), (21.35, 3.974873734))
        make_face()
        with BuildLine():
            ThreePointArc((21.35, -10.974873734), (21.252268718, -10.868730822), (21.163613406, -10.754897801))
            ThreePointArc((21.163613406, -10.754897801), (21.302263988, -11.031028277), (21.35, -11.336304049))
            Line((21.35, -11.336304049), (21.35, -10.974873734))
        make_face()
        with BuildLine():
            Line((23.824873734, -8.5), (24.186304049, -8.5))
            ThreePointArc((24.186304049, -8.5), (23.881028277, -8.452263988), (23.604897801, -8.313613406))
            ThreePointArc((23.604897801, -8.313613406), (23.718730822, -8.402268718), (23.824873734, -8.5))
        make_face()
        with BuildLine():
            ThreePointArc((23.824873734, 1.5), (23.718730822, 1.402268718), (23.604897801, 1.313613406))
            ThreePointArc((23.604897801, 1.313613406), (23.881028277, 1.452263988), (24.186304049, 1.5))
            Line((24.186304049, 1.5), (23.824873734, 1.5))
        make_face()
        with BuildLine():
            ThreePointArc((3.95, 2.155806114), (4.001179611, 2.059262422), (4.05, 1.961504525))
            ThreePointArc((4.05, 1.961504525), (3.975320566, 2.173787622), (3.95, 2.397394419))
            Line((3.95, 2.397394419), (3.95, 2.155806114))
        make_face()
        with BuildLine():
            Line((-4.5, 0), (-5.408326913, 0))
            ThreePointArc((-5.408326913, 0), (-4.768724764, -0.231293885), (-4.424994747, -0.818181818))
            ThreePointArc((-4.424994747, -0.818181818), (-4.481209455, -0.410806303), (-4.5, 0))
        make_face()
        with BuildLine():
            ThreePointArc((-21.05, -1), (-20.757106781, -0.292893219), (-20.05, 0))
            Line((-20.05, 0), (-21.05, 0))
            Line((-21.05, 0), (-21.05, -1))
        make_face()
    extrude(amount=FILLET15_2_DEPTH, mode=Mode.SUBTRACT)

    # Fillet14
    fillet14_edges = [part.edges().sort_by_distance(p)[0] for p in [
        (3.95, 21.05, 8.5),
    ]]
    fillet(fillet14_edges, radius=FILLET14_R)

    # Sketch43 → Boss-Extrude8 (add)
    with BuildSketch(Plane(origin=(0, 0, 1.75), x_dir=(-1, 0, 0), z_dir=(0, 0, -1))):
        with BuildLine():
            Line((-7.958196408, -2.5), (-2.795084972, -2.5))
            ThreePointArc((-2.795084972, -2.5), (-3.405912604, -1.569158797), (-3.716517187, -0.5))
            Line((-3.716517187, -0.5), (-3.95, 2.397394419))
            ThreePointArc((-3.95, 2.397394419), (-3.975320566, 2.173787621), (-4.05, 1.961504525))
            ThreePointArc((-4.05, 1.961504525), (-4.471062928, 0.509505933), (-4.387482194, -1))
            ThreePointArc((-4.387482194, -1), (-6.021704735, -2.109772229), (-7.958196408, -2.5))
        make_face()
    extrude(amount=-BOSS_EXTRUDE8_DEPTH)

    # Sketch44 → Boss-Extrude9 (add)
    with BuildSketch(Plane.XY.offset(10).offset(BOSS_EXTRUDE9_START)):
        with BuildLine():
            Line((2.795084972, -2.5), (3.741657387, -2.5))
            ThreePointArc((3.741657387, -2.5), (3.460439649, -2.8766921), (3.141459482, -3.221991981))
            ThreePointArc((3.141459482, -3.221991981), (2.924302047, -3.472013717), (2.751378238, -3.754441718))
            ThreePointArc((2.751378238, -3.754441718), (2.910754521, -3.132012375), (2.795084972, -2.5))
        make_face()
    extrude(amount=BOSS_EXTRUDE9_DEPTH)

    # Sketch45 → Boss-Extrude10 (add)
    with BuildSketch(Plane(origin=(0, 0, 6), x_dir=(-1, 0, 0), z_dir=(0, 0, -1)).offset(BOSS_EXTRUDE10_START)):
        with BuildLine():
            Line((-2.795084972, -2.5), (-3.741657387, -2.5))
            ThreePointArc((-3.741657387, -2.5), (-3.627579558, -2.662830553), (-3.506420776, -2.82046332))
            ThreePointArc((-3.506420776, -2.82046332), (-3.377802295, -3.523133979), (-3.896023084, -4.014800515))
            ThreePointArc((-3.896023084, -4.014800515), (-3.225542277, -3.597917993), (-2.898226041, -2.879447653))
            ThreePointArc((-2.898226041, -2.879447653), (-2.859143104, -2.68632946), (-2.795084972, -2.5))
        make_face()
    extrude(amount=-BOSS_EXTRUDE10_DEPTH)

    # Sketch53 → Cut-Extrude35 (cut)
    with BuildSketch(Plane(origin=(0, 0, 0), x_dir=(-1, 0, 0), z_dir=(0, 0, -1))):
        with BuildLine():
            Line((-17.95, -0.5), (-12.05, -0.5))
            Line((-12.05, -0.5), (-12.05, 2.4255002))
            ThreePointArc((-12.05, 2.4255002), (-15.95, 3.05), (-12.05, 3.6744998))
            Line((-12.05, 3.6744998), (-12.05, 6.594945256))
            ThreePointArc((-12.05, 6.594945256), (-13.745117213, 6.112620898), (-15.5, 5.95))
            Line((-15.5, 5.95), (-17.95, 5.95))
            Line((-17.95, 5.95), (-17.95, -0.5))
        make_face()
    extrude(amount=-CUT_EXTRUDE35_DEPTH, mode=Mode.SUBTRACT)

    # Fillet18
    # the kernel refuses this fillet: 2 mm, written as the material it takes off along each edge
    with BuildSketch(Plane(origin=(-21.05, -2, -2.580127019), x_dir=(1, 0, 0), z_dir=(0, 0, 1))) as fillet18_piece_1:
        with BuildLine():
            CenterArc((1.732050808, 2), FILLET18_R, 210, 60)
            Line((0, 1), (-0.034641016, 0.98))
            ThreePointArc((-0.034641016, 0.98), (-0.04, 0.5), (-0.04, 0))
            Line((-0.04, 0), (0, -0.04))
            Line((0, -0.04), (1.732050808, -0.04))
            Line((1.732050808, -0.04), (1.732050808, 0))
        make_face()
    extrude(amount=6.330127019, mode=Mode.SUBTRACT)
    with BuildSketch(Plane(origin=(-21.05, -4.5, -3.25), x_dir=(1, 0, 0), z_dir=(0, 0, 1))) as fillet18_piece_2:
        with BuildLine():
            CenterArc((FILLET18_R, -FILLET18_R), FILLET18_R, 90, 90)
            Line((0, -FILLET18_R), (-FILLET18_R * 0.02, -FILLET18_R))
            Line((-FILLET18_R * 0.02, -FILLET18_R), (-FILLET18_R * 0.02, FILLET18_R * 0.02))
            Line((-FILLET18_R * 0.02, FILLET18_R * 0.02), (FILLET18_R, FILLET18_R * 0.02))
            Line((FILLET18_R, FILLET18_R * 0.02), (FILLET18_R, 0))
        make_face()
    extrude(amount=7, mode=Mode.SUBTRACT)


solid = part.part
